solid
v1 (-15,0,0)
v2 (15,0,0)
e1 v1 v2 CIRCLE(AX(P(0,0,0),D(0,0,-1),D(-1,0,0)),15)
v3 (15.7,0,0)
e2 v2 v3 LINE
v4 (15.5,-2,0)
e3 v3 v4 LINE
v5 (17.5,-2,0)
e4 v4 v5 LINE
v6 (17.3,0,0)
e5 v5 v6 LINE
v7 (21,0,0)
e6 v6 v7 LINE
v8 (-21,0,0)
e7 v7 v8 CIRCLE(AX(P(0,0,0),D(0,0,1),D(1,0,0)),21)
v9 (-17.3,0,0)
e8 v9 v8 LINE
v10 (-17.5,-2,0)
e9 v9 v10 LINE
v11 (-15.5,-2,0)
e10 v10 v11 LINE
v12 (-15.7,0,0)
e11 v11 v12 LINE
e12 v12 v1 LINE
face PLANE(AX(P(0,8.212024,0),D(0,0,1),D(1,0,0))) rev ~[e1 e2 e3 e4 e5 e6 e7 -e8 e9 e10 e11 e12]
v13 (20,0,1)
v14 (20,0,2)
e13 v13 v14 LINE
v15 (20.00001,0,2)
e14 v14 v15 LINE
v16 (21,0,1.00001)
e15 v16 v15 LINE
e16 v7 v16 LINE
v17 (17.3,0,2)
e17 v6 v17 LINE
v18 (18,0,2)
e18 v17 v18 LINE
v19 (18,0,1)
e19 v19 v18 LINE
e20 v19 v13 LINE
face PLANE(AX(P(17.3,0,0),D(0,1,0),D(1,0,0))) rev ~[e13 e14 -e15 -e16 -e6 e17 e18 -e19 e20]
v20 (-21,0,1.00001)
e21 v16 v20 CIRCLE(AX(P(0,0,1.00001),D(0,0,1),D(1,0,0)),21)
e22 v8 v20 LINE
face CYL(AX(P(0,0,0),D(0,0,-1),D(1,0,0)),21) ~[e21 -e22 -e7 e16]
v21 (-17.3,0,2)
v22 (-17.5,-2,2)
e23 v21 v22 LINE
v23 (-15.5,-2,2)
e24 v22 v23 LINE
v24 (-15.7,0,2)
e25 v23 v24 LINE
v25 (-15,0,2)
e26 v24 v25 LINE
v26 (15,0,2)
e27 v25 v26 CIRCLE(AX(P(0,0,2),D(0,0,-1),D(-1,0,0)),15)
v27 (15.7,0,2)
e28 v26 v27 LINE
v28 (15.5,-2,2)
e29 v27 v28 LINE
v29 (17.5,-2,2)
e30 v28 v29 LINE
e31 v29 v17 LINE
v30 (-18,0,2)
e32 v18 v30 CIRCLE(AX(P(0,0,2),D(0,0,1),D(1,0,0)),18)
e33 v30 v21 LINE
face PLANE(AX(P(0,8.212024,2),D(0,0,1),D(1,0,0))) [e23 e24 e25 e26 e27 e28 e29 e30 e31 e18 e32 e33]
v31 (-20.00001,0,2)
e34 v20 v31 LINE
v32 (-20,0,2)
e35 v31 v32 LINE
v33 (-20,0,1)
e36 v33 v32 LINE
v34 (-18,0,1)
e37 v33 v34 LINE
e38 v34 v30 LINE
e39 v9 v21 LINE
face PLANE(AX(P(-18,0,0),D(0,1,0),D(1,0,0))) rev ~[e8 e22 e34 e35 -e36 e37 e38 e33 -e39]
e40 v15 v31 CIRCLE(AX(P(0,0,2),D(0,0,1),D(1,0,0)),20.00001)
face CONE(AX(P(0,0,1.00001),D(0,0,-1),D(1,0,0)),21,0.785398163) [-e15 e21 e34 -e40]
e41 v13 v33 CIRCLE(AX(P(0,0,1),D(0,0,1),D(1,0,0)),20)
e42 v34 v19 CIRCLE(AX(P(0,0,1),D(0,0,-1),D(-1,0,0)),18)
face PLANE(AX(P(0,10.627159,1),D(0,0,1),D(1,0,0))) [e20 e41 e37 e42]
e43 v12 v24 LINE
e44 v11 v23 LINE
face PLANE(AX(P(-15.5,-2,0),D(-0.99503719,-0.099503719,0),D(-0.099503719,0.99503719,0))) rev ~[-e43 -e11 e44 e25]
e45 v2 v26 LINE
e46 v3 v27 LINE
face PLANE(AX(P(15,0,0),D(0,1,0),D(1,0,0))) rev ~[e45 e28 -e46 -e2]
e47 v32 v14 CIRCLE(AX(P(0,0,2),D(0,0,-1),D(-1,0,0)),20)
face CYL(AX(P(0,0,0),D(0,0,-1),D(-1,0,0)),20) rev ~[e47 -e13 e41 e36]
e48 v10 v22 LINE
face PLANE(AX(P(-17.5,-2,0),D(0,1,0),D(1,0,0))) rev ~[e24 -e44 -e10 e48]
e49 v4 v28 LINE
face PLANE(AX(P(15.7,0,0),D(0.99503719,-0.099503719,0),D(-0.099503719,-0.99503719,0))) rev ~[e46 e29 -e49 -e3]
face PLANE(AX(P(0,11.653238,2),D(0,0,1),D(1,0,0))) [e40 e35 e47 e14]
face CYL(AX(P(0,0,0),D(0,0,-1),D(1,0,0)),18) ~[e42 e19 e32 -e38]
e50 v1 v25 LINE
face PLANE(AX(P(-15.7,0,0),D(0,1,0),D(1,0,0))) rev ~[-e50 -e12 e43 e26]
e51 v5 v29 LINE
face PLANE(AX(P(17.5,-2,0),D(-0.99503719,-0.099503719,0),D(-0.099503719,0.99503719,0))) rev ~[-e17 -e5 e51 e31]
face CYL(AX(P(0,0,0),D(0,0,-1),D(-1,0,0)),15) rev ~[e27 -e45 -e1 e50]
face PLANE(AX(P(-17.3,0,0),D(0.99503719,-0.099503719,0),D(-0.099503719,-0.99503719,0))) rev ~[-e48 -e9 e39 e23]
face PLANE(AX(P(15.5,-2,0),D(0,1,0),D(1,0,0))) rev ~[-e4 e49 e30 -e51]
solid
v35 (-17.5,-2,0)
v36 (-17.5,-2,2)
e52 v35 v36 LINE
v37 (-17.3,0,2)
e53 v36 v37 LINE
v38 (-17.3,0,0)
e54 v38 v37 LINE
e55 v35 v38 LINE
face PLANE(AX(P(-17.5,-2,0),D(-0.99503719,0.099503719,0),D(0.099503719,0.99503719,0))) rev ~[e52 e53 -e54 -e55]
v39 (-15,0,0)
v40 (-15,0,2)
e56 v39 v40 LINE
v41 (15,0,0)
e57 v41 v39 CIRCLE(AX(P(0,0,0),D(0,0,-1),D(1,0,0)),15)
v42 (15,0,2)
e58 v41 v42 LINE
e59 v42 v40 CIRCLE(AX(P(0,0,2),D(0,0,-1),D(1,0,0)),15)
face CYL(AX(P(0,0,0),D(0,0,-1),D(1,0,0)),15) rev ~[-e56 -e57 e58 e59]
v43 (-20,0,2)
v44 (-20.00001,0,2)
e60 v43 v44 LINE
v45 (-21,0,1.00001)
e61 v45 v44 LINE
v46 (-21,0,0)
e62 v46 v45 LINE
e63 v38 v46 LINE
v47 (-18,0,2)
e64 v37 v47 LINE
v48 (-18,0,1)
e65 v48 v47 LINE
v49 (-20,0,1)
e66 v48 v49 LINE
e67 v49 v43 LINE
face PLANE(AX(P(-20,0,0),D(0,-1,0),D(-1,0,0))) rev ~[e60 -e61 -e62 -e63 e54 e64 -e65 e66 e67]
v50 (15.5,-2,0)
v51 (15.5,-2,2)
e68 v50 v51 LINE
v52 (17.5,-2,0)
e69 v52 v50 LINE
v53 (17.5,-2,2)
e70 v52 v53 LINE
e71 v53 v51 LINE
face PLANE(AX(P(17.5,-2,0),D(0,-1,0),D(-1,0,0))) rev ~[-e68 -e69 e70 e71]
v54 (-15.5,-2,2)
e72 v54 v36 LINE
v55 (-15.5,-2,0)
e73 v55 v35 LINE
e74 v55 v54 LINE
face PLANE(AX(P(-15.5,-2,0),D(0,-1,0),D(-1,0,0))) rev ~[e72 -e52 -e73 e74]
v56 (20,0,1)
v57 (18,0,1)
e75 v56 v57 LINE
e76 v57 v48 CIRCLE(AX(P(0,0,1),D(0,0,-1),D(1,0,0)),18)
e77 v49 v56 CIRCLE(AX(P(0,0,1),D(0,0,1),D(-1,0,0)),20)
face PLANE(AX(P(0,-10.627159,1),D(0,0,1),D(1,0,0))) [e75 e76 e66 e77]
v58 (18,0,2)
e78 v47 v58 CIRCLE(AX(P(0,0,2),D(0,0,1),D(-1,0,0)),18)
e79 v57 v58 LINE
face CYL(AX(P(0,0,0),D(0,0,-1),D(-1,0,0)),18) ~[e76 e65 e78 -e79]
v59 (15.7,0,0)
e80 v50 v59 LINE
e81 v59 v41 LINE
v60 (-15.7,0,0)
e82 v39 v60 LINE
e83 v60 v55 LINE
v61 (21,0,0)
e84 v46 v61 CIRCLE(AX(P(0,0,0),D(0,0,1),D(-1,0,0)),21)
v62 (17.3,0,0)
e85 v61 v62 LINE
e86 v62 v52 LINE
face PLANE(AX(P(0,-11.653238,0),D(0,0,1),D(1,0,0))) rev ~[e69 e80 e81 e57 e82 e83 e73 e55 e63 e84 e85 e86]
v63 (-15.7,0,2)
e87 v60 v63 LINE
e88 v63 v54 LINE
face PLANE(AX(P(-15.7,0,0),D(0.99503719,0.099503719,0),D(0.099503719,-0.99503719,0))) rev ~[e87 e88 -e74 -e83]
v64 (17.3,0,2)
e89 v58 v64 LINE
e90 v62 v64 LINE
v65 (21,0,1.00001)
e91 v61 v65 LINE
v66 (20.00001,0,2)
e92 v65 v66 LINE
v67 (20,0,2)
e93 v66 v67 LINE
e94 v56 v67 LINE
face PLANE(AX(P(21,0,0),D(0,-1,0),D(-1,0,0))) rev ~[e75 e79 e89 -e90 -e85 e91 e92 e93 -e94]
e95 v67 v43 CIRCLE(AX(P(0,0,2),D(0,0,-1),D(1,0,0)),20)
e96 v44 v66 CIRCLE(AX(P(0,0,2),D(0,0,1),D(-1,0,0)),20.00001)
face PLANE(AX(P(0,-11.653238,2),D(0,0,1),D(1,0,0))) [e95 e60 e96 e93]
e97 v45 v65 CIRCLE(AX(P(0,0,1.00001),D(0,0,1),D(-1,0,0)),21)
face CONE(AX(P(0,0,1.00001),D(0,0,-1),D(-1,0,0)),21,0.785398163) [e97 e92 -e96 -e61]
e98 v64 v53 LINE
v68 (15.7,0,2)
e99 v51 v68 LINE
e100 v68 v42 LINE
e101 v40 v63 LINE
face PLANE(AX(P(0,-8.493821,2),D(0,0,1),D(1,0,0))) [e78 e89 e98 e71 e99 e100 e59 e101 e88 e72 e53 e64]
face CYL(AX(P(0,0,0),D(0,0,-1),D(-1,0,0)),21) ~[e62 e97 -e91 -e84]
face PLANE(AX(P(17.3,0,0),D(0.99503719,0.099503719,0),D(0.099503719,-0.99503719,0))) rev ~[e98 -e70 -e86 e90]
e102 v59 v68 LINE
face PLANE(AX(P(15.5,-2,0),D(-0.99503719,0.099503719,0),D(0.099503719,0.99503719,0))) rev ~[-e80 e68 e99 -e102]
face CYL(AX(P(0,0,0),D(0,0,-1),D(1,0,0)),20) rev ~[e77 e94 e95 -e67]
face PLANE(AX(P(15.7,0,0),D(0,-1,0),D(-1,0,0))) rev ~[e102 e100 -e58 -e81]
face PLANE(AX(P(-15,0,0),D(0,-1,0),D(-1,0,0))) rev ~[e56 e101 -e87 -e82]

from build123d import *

# Parameters (mm, degrees)
F1_DEPTH  = 2
F2_DEPTH  = 1
F3_DEPTH  = 2
F4_DEPTH  = 2
F5_DEPTH  = 1
F6_DEPTH  = 2
F7_SIZE   = 0.99999
F7_2_SIZE = 0.99999


# Not quite as in the source:
# - a fillet or chamfer is up to 0.001 mm smaller than in the source, because OpenCascade refuses the exact size


with BuildPart() as f1:
    # F0 (on Top) → F1 (new body)
    with BuildSketch(Plane.XY):
        with BuildLine():
            Line((20, 0), (21, 0))
            ThreePointArc((21, 0), (0, 21), (-21, 0))
            Line((-21, 0), (-20, 0))
            ThreePointArc((-20, 0), (0, 20), (20, 0))
        make_face()
    extrude(amount=F1_DEPTH)

    # F0 (on Top) → F2 (join)
    with BuildSketch(Plane.XY):
        with BuildLine():
            Line((18, 0), (20, 0))
            ThreePointArc((20, 0), (0, 20), (-20, 0))
            Line((-20, 0), (-18, 0))
            ThreePointArc((-18, 0), (0, 18), (18, 0))
        make_face()
    extrude(amount=F2_DEPTH)

    # F0 (on Top) → F3 (join)
    with BuildSketch(Plane.XY):
        with BuildLine():
            Line((17.3, 0), (18, 0))
            ThreePointArc((18, 0), (0, 18), (-18, 0))
            Line((-18, 0), (-17.3, 0))
            Line((-17.3, 0), (-17.5, -2))
            Line((-17.5, -2), (-16.5, -2))
            Line((-16.5, -2), (-15.5, -2))
            Line((-15.5, -2), (-15.7, 0))
            Line((-15.7, 0), (-15, 0))
            ThreePointArc((-15, 0), (0, 15), (15, 0))
            Line((15, 0), (15.7, 0))
            Line((15.7, 0), (15.5, -2))
            Line((15.5, -2), (16.5, -2))
            Line((16.5, -2), (17.5, -2))
            Line((17.5, -2), (17.3, 0))
        make_face()
    extrude(amount=F3_DEPTH)

    # F7 (size 1 in the source; OpenCascade refuses exactly that, so slightly less here)
    f7_edges = [f1.edges().sort_by_distance(p)[0] for p in [
        (0, 21, 2),
    ]]
    chamfer(f7_edges, length=F7_SIZE)


with BuildPart() as f4:
    # F0 (on Top) → F4 (new body)
    with BuildSketch(Plane.XY):
        with BuildLine():
            ThreePointArc((-18, 0), (0, -18), (18, 0))
            Line((18, 0), (17.3, 0))
            Line((17.3, 0), (17.5, -2))
            Line((17.5, -2), (16.5, -2))
            Line((16.5, -2), (15.5, -2))
            Line((15.5, -2), (15.7, 0))
            Line((15.7, 0), (15, 0))
            ThreePointArc((15, 0), (0, -15), (-15, 0))
            Line((-15, 0), (-15.7, 0))
            Line((-15.7, 0), (-15.5, -2))
            Line((-15.5, -2), (-16.5, -2))
            Line((-16.5, -2), (-17.5, -2))
            Line((-17.5, -2), (-17.3, 0))
            Line((-17.3, 0), (-18, 0))
        make_face()
    extrude(amount=F4_DEPTH)

    # F0 (on Top) → F5 (join)
    with BuildSketch(Plane.XY):
        with BuildLine():
            ThreePointArc((-20, 0), (0, -20), (20, 0))
            Line((20, 0), (18, 0))
            ThreePointArc((18, 0), (0, -18), (-18, 0))
            Line((-18, 0), (-20, 0))
        make_face()
    extrude(amount=F5_DEPTH)

    # F0 (on Top) → F6 (join)
    with BuildSketch(Plane.XY):
        with BuildLine():
            ThreePointArc((-21, 0), (0, -21), (21, 0))
            Line((21, 0), (20, 0))
            ThreePointArc((20, 0), (0, -20), (-20, 0))
            Line((-20, 0), (-21, 0))
        make_face()
    extrude(amount=F6_DEPTH)

    # F7#2 (size 1 in the source; OpenCascade refuses exactly that, so slightly less here)
    f7_2_edges = [f4.edges().sort_by_distance(p)[0] for p in [
        (0, -21, 2),
    ]]
    chamfer(f7_2_edges, length=F7_2_SIZE)


solid = Compound([f1.part, f4.part])
